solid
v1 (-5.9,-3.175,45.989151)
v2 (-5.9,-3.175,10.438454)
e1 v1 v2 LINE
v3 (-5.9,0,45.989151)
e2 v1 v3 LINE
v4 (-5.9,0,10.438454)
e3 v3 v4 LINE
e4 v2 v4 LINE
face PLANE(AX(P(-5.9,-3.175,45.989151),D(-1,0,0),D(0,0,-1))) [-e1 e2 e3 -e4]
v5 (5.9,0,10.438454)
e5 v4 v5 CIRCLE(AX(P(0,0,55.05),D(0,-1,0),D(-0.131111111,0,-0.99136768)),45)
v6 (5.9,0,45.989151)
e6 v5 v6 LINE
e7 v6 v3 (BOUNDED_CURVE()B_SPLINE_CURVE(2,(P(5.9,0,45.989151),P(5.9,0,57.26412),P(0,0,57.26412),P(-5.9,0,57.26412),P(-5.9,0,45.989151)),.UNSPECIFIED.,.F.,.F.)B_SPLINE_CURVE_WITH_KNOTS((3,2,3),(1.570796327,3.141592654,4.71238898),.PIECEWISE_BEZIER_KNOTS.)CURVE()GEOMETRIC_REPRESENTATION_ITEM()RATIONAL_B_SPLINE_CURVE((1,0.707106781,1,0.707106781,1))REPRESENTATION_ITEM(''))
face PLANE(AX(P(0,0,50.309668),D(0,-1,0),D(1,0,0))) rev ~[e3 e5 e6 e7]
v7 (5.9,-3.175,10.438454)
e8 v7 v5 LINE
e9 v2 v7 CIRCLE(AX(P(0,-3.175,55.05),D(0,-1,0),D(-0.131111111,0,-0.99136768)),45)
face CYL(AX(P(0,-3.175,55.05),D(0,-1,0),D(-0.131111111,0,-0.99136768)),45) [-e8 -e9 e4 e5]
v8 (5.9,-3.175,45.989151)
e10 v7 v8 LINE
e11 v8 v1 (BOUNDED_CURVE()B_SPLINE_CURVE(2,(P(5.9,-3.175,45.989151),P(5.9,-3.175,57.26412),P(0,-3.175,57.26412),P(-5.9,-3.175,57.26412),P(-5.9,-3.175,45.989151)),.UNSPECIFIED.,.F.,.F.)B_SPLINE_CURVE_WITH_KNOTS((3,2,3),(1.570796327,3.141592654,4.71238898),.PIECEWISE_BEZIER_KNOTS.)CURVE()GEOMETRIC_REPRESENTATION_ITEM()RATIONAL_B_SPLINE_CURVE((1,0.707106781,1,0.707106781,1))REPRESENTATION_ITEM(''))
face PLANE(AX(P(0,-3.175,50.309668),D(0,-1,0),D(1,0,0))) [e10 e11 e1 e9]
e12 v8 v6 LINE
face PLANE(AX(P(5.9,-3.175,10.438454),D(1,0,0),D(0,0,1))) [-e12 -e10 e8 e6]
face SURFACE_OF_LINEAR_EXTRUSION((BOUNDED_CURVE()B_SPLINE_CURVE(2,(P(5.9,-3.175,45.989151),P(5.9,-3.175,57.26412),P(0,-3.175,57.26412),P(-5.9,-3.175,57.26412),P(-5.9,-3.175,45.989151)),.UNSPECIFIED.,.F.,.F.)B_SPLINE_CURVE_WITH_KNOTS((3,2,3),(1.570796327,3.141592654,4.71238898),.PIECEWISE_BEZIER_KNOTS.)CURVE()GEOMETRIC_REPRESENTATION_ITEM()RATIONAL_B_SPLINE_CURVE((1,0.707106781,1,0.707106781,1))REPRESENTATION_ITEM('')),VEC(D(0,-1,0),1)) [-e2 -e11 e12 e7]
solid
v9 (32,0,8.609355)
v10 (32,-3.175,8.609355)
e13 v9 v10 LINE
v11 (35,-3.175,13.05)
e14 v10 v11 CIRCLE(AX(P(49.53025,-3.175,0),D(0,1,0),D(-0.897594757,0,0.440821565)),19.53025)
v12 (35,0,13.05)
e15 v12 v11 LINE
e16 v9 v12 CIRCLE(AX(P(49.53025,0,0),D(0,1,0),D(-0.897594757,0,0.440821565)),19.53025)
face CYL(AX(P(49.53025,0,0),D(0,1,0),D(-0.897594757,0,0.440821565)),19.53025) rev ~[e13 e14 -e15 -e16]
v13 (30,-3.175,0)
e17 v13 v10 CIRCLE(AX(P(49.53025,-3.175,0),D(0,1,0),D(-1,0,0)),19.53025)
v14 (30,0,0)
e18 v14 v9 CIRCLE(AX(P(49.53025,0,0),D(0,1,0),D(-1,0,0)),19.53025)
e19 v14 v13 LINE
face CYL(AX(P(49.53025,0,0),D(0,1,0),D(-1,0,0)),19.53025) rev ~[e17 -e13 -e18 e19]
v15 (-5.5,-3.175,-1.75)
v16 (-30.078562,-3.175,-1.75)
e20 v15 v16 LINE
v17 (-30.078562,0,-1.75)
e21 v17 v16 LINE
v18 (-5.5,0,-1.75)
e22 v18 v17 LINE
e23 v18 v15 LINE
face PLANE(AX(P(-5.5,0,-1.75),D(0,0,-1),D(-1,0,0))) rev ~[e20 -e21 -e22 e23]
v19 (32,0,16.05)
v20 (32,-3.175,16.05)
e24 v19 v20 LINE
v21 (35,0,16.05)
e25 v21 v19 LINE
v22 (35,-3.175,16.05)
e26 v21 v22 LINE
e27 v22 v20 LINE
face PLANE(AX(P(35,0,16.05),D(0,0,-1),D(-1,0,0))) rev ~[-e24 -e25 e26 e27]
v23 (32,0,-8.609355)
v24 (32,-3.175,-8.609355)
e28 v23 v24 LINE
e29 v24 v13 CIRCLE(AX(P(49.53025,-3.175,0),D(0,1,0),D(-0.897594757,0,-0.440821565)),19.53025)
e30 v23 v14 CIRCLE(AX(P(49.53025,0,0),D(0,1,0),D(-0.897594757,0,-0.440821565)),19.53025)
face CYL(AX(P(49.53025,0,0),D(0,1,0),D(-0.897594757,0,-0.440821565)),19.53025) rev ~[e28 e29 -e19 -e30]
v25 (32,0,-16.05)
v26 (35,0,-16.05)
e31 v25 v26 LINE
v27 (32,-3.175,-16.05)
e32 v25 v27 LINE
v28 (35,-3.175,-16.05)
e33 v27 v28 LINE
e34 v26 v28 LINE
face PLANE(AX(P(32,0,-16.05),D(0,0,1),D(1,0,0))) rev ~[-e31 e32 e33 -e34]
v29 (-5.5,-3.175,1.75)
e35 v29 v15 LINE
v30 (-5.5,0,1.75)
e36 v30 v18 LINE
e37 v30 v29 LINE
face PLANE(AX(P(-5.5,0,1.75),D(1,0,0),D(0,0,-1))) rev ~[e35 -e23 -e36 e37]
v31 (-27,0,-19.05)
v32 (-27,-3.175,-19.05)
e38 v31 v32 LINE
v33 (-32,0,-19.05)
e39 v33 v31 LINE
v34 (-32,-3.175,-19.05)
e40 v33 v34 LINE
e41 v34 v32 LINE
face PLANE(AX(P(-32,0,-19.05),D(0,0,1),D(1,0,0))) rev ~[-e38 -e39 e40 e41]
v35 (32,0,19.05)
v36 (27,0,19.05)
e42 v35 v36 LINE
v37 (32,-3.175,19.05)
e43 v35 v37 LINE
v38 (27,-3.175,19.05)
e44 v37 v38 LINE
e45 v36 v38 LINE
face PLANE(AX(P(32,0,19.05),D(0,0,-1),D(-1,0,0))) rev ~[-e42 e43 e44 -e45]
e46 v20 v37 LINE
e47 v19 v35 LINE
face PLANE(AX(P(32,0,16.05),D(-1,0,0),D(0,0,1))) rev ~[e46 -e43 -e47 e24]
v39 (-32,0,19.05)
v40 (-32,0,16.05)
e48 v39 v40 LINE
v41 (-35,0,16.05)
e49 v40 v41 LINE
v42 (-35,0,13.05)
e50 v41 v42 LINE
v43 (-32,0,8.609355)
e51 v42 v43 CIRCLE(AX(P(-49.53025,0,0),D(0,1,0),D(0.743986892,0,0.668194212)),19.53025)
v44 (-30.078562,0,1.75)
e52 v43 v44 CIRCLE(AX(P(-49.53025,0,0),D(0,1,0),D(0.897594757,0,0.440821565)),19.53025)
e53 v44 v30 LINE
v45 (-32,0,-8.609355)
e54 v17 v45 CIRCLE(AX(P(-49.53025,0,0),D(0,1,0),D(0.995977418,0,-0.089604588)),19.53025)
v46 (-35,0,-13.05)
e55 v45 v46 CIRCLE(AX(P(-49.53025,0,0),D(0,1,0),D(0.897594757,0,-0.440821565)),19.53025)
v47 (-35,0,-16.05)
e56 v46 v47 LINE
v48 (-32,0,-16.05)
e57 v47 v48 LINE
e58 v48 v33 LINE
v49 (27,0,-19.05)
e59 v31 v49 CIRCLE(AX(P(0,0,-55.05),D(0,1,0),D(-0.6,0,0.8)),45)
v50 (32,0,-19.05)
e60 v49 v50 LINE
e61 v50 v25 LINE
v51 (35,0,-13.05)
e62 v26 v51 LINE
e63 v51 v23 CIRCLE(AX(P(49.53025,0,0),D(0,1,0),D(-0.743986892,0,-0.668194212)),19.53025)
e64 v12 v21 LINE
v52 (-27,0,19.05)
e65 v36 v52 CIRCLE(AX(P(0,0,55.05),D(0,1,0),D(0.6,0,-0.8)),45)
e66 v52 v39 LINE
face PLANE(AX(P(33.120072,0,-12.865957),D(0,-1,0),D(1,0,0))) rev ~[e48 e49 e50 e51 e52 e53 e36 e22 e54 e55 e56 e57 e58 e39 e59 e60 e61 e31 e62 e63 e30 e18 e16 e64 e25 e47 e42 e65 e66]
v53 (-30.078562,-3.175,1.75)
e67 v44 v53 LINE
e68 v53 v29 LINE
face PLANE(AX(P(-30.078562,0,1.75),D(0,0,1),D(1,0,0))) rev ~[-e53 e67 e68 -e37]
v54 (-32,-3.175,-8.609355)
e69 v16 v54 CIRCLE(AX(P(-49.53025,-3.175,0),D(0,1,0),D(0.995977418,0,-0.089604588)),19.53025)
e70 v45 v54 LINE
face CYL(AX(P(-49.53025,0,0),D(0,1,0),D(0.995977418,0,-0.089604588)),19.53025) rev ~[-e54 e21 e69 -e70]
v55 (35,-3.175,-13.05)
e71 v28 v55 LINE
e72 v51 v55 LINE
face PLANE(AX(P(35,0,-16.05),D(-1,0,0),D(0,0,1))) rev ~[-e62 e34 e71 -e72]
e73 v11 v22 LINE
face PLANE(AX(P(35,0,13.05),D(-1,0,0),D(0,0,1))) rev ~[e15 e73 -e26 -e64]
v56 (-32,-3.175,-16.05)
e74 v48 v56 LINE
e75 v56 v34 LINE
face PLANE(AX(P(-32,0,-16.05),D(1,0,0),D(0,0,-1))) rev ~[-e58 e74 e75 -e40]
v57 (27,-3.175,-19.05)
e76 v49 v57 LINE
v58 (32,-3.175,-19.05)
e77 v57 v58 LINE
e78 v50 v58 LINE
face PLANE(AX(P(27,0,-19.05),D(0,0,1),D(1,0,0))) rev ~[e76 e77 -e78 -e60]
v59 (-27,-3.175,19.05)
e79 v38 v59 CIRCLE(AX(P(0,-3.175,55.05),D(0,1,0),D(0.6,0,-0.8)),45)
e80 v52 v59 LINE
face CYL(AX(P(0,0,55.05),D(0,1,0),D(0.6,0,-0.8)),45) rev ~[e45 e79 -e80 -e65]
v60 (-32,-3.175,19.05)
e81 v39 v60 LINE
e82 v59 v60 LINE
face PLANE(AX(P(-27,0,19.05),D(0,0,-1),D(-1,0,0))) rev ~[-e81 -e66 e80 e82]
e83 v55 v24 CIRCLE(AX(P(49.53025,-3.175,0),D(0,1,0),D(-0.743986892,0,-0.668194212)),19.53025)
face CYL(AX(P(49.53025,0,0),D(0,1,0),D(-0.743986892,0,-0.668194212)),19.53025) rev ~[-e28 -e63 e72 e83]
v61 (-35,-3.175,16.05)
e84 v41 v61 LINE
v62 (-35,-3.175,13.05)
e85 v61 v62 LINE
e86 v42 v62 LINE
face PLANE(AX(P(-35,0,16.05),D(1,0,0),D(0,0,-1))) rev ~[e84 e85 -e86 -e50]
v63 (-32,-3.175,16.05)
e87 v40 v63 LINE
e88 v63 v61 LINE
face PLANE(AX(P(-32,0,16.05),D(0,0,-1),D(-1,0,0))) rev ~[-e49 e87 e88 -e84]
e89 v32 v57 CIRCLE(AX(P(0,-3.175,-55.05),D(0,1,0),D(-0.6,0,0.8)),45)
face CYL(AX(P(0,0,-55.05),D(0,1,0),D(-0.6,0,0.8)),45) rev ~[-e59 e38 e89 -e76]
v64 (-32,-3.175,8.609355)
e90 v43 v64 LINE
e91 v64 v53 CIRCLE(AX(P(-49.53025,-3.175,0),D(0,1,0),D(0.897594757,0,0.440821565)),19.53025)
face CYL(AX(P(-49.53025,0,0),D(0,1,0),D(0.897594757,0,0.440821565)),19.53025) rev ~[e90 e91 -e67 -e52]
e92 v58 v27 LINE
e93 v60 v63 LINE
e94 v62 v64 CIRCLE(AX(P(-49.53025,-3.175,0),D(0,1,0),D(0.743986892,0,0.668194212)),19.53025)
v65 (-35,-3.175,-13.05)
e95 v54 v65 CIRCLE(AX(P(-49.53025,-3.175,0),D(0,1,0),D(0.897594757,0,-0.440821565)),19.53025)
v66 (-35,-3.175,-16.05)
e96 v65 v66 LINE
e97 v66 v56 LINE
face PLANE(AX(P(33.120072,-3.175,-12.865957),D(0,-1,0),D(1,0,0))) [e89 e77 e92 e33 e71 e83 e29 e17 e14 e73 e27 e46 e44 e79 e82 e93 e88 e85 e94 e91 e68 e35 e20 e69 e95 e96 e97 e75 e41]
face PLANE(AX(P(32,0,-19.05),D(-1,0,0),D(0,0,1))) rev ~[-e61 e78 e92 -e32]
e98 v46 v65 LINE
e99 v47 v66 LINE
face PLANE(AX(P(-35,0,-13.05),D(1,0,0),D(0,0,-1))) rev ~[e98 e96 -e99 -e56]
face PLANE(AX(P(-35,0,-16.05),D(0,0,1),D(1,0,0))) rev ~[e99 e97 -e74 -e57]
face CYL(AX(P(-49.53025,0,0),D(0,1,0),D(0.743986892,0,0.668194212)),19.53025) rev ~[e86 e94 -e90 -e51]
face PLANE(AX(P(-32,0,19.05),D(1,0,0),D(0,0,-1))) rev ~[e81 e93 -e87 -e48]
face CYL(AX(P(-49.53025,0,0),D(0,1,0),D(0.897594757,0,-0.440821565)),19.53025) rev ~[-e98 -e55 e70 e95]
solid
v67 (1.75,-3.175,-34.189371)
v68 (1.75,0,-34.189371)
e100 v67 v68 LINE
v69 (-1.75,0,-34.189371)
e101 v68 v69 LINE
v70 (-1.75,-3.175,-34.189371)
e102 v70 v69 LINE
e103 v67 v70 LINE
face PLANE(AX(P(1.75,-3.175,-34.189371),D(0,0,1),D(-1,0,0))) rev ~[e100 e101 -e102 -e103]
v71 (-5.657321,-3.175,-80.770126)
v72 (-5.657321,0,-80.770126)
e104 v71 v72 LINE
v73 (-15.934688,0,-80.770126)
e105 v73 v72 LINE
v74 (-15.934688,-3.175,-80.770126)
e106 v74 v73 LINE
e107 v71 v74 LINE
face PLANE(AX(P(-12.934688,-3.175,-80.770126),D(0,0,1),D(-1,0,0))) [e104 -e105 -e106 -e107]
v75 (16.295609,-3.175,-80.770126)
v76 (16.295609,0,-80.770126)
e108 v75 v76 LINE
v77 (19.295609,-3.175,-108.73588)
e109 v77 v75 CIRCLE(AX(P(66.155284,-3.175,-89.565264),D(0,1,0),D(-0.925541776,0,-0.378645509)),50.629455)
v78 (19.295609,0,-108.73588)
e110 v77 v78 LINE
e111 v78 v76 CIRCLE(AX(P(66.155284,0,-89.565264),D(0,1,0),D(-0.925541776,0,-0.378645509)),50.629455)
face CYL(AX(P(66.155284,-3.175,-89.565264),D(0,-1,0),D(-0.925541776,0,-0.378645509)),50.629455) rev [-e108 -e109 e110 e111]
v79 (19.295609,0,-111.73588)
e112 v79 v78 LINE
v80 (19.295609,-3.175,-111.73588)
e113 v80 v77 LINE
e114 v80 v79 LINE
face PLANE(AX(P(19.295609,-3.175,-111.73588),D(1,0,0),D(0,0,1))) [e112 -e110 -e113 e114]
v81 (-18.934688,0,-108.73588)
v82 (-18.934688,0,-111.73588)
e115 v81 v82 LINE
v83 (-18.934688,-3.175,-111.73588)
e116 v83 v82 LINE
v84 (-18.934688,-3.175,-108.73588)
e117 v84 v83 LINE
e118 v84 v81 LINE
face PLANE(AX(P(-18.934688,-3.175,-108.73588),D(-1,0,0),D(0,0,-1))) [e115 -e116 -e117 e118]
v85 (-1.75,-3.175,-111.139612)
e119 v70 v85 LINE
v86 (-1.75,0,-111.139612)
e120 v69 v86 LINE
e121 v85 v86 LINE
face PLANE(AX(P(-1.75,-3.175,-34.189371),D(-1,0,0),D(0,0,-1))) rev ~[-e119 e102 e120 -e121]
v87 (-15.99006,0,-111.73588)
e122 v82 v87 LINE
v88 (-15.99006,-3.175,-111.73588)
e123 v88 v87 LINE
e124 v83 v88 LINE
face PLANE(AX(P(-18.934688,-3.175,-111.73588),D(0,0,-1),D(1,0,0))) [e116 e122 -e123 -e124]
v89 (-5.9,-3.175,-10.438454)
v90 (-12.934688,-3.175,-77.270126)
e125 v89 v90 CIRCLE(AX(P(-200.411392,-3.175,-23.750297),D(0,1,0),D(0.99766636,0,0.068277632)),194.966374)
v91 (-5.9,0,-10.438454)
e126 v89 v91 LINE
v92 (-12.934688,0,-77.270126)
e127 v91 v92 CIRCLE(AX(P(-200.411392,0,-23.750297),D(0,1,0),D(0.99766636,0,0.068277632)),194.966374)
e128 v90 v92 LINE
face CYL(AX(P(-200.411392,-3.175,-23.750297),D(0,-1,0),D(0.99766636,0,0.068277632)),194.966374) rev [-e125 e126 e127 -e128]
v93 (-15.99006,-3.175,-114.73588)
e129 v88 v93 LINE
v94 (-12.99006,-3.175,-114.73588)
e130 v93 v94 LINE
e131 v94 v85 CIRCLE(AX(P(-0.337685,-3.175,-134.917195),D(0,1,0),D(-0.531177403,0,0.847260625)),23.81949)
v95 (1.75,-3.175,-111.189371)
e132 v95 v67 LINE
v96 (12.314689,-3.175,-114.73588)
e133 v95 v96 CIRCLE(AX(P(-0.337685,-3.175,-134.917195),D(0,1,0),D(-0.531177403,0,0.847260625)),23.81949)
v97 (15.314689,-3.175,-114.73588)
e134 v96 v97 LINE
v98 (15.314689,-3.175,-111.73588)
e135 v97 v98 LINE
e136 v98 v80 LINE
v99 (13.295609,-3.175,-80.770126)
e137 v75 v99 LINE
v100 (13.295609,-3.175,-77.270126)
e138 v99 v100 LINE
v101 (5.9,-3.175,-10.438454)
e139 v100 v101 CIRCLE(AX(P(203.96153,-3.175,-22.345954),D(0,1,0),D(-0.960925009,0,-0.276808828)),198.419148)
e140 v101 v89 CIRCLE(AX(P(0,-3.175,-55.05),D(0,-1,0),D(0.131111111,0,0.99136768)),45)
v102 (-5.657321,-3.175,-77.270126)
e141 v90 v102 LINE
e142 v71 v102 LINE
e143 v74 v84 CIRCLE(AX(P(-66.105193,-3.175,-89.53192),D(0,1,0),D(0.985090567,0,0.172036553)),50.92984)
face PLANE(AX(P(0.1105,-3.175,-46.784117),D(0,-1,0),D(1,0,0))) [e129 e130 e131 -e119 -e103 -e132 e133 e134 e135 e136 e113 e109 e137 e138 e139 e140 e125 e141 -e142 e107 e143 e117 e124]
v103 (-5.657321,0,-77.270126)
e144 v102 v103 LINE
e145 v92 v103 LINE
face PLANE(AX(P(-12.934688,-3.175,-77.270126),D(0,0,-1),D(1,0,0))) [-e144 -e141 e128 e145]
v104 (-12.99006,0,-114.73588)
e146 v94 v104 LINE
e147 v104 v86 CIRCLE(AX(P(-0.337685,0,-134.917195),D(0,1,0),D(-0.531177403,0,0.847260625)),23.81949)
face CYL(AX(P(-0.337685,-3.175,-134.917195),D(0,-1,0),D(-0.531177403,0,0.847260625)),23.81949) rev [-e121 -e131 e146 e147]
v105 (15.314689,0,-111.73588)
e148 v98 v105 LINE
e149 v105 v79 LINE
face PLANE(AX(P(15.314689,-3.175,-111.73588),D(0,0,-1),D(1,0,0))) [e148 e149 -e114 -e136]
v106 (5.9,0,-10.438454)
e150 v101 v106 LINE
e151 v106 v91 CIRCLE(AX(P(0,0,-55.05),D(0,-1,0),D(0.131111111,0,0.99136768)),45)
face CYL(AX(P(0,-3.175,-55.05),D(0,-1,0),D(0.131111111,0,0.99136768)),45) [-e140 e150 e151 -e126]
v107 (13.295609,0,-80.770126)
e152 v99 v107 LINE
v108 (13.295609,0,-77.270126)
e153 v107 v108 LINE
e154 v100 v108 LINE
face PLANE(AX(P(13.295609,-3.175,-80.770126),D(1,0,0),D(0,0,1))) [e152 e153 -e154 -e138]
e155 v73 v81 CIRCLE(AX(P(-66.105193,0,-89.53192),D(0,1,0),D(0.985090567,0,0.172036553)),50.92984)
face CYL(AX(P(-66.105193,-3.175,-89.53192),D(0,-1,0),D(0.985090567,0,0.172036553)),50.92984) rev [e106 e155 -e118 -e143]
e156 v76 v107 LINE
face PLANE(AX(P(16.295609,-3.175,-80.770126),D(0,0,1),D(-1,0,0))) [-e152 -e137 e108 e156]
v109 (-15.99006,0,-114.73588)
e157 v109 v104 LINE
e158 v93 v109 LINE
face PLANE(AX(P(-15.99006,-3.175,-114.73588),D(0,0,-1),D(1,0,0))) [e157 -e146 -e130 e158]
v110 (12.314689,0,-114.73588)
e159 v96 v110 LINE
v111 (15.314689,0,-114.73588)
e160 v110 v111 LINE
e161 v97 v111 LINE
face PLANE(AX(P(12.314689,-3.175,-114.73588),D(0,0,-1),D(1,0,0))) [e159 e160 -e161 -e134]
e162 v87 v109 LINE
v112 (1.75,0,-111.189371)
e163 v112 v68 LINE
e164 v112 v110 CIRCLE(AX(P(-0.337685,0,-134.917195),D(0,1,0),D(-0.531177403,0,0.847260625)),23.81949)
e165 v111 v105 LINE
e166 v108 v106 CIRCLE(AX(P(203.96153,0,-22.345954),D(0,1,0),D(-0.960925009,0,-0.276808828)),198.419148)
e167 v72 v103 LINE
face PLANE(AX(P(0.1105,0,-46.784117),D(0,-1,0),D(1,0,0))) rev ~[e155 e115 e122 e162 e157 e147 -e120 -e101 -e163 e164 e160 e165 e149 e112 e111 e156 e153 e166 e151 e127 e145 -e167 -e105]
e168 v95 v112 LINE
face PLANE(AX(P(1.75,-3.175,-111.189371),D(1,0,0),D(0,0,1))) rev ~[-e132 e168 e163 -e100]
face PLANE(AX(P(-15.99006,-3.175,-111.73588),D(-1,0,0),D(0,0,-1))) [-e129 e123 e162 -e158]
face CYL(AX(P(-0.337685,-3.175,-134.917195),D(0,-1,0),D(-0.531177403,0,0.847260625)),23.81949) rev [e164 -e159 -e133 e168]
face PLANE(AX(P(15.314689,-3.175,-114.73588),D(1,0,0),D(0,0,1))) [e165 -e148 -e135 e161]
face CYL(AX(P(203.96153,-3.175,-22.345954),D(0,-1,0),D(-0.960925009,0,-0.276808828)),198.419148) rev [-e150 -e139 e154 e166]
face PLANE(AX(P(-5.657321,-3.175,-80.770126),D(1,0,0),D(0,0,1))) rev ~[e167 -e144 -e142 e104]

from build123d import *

# Parameters (mm, degrees)
F1_DEPTH = 3.175
F3_DEPTH = 3.175
F4_W     = 7.2773662827
F4_H     = 3.5
F5_DEPTH = 3.1760001


# Not quite as in the source:
# - a length typed as a fraction of an inch, garbled in the dataset ("3 / 203.2 mm" for 3/8 in), is restored


with BuildPart() as f1:
    # F0 (on Front) → F1 (new body)
    with BuildSketch(Plane.XZ):
        with BuildLine():
            Line((32, -16.05), (35, -16.05))
            Line((35, -16.05), (35, -13.05))
            ThreePointArc((35, -13.05), (33.3469639854, -10.9330653905), (32, -8.6093553766))
            Line((32, -8.6093553766), (32, -16.05))
        make_face()
        with BuildLine():
            ThreePointArc((32, 8.6093553766), (33.3469639854, 10.9330653905), (35, 13.05))
            Line((35, 13.05), (35, 16.05))
            Line((35, 16.05), (32, 16.05))
            Line((32, 16.05), (32, 8.6093553766))
        make_face()
        with BuildLine():
            Line((-35, -16.05), (-32, -16.05))
            Line((-32, -16.05), (-32, -8.6093553766))
            ThreePointArc((-32, -8.6093553766), (-33.3469639854, -10.9330653905), (-35, -13.05))
            Line((-35, -13.05), (-35, -16.05))
        make_face()
        with BuildLine():
            ThreePointArc((-35, 13.05), (-33.3469639854, 10.9330653905), (-32, 8.6093553766))
            Line((-32, 8.6093553766), (-32, 16.05))
            Line((-32, 16.05), (-35, 16.05))
            Line((-35, 16.05), (-35, 13.05))
        make_face()
        with BuildLine():
            Line((27, -19.05), (32, -19.05))
            Line((32, -19.05), (32, -16.05))
            Line((32, -16.05), (32, -8.6093553766))
            ThreePointArc((32, -8.6093553766), (30.5065696236, -4.4193042439), (30, 0))
            Line((30, 0), (-5.5, 0))
            Line((-5.5, 0), (-5.5, -1.75))
            Line((-5.5, -1.75), (-30.0785620254, -1.75))
            ThreePointArc((-30.0785620254, -1.75), (-30.7239047108, -5.268020684), (-32, -8.6093553766))
            Line((-32, -8.6093553766), (-32, -16.05))
            Line((-32, -16.05), (-32, -19.05))
            Line((-32, -19.05), (-27, -19.05))
            ThreePointArc((-27, -19.05), (0, -10.05), (27, -19.05))
        make_face()
        with BuildLine():
            ThreePointArc((30, 0), (30.5065696236, 4.4193042439), (32, 8.6093553766))
            Line((32, 8.6093553766), (32, 16.05))
            Line((32, 16.05), (32, 19.05))
            Line((32, 19.05), (27, 19.05))
            ThreePointArc((27, 19.05), (0, 10.05), (-27, 19.05))
            Line((-27, 19.05), (-32, 19.05))
            Line((-32, 19.05), (-32, 16.05))
            Line((-32, 16.05), (-32, 8.6093553766))
            ThreePointArc((-32, 8.6093553766), (-30.7239047108, 5.268020684), (-30.0785620254, 1.75))
            Line((-30.0785620254, 1.75), (-5.5, 1.75))
            Line((-5.5, 1.75), (-5.5, 0))
            Line((-5.5, 0), (30, 0))
        make_face()
    extrude(amount=F1_DEPTH)


with BuildPart() as f3:
    # F2 (on face) → F3 (new body)
    with BuildSketch(Plane.XZ.offset(3.175)):
        with BuildLine():
            add(Edge.make_bspline(
                [(5.9, 45.9891505916), (5.9, 57.2641204958), (0, 57.2641204958), (-5.9, 57.2641204958), (-5.9, 45.9891505916)],
                knots=[1.5707963268, 1.5707963268, 1.5707963268, 3.1415926536, 3.1415926536, 4.7123889804, 4.7123889804, 4.7123889804], degree=2, weights=[1, 0.7071067812, 1, 0.7071067812, 1]))
            Line((-5.9, 45.9891505916), (5.9, 45.9891505916))
        make_face()
        with BuildLine():
            Line((-5.9, 45.9891505916), (-5.9, 10.4384544092))
            Line((-5.9, 10.4384544092), (5.9, 10.4384544092))
            Line((5.9, 10.4384544092), (5.9, 45.9891505916))
            add(Edge.make_bspline(
                [(0, 34.7141806875), (5.9, 34.7141806875), (5.9, 45.9891505916)],
                knots=[0, 0, 0, 1.5707963268, 1.5707963268, 1.5707963268], degree=2, weights=[1, 0.7071067812, 1]))
            add(Edge.make_bspline(
                [(-5.9, 45.9891505916), (-5.9, 34.7141806875), (0, 34.7141806875)],
                knots=[4.7123889804, 4.7123889804, 4.7123889804, 6.2831853072, 6.2831853072, 6.2831853072], degree=2, weights=[1, 0.7071067812, 1]))
        make_face()
        with BuildLine():
            Line((5.9, 45.9891505916), (-5.9, 45.9891505916))
            add(Edge.make_bspline(
                [(-5.9, 45.9891505916), (-5.9, 34.7141806875), (0, 34.7141806875)],
                knots=[4.7123889804, 4.7123889804, 4.7123889804, 6.2831853072, 6.2831853072, 6.2831853072], degree=2, weights=[1, 0.7071067812, 1]))
            add(Edge.make_bspline(
                [(0, 34.7141806875), (5.9, 34.7141806875), (5.9, 45.9891505916)],
                knots=[0, 0, 0, 1.5707963268, 1.5707963268, 1.5707963268], degree=2, weights=[1, 0.7071067812, 1]))
        make_face()
        with BuildLine():
            ThreePointArc((13.2956086248, -77.2701255913), (6.7462265041, -44.1698462786), (5.9, -10.4384544092))
            Line((5.9, -10.4384544092), (-5.9, -10.4384544092))
            ThreePointArc((-5.9, -10.4384544092), (-6.5162024945, -44.1596635216), (-12.9346875995, -77.2701255913))
            Line((-12.9346875995, -77.2701255913), (13.2956086248, -77.2701255913))
        make_face()
        with BuildLine():
            Line((13.2956086248, -80.7701255913), (13.2956086248, -77.2701255913))
            Line((13.2956086248, -77.2701255913), (-12.9346875995, -77.2701255913))
            Line((-12.9346875995, -77.2701255913), (-12.9346875995, -80.7701255913))
            Line((-12.9346875995, -80.7701255913), (-15.9346875995, -80.7701255913))
            ThreePointArc((-15.9346875995, -80.7701255913), (-15.4658906298, -94.9642033946), (-18.9346875995, -108.7358795042))
            Line((-18.9346875995, -108.7358795042), (-18.9346875995, -111.7358795042))
            Line((-18.9346875995, -111.7358795042), (-15.9900602624, -111.7358795042))
            Line((-15.9900602624, -111.7358795042), (-15.9900602624, -114.7358795042))
            Line((-15.9900602624, -114.7358795042), (-12.9900602624, -114.7358795042))
            ThreePointArc((-12.9900602624, -114.7358795042), (-0.3376854584, -111.0977054943), (12.3146893457, -114.7358795042))
            Line((12.3146893457, -114.7358795042), (15.3146893457, -114.7358795042))
            Line((15.3146893457, -114.7358795042), (15.3146893457, -111.7358795042))
            Line((15.3146893457, -111.7358795042), (19.2956086248, -111.7358795042))
            Line((19.2956086248, -111.7358795042), (19.2956086248, -108.7358795042))
            ThreePointArc((19.2956086248, -108.7358795042), (15.814653799, -94.9655076172), (16.2956086248, -80.7701255913))
            Line((16.2956086248, -80.7701255913), (13.2956086248, -80.7701255913))
        make_face()
        with BuildLine():
            Line((5.9, 10.4384544092), (-5.9, 10.4384544092))
            ThreePointArc((-5.9, 10.4384544092), (0, 10.05), (5.9, 10.4384544092))
        make_face()
        with BuildLine():
            Line((-5.9, -10.4384544092), (5.9, -10.4384544092))
            ThreePointArc((5.9, -10.4384544092), (0, -10.05), (-5.9, -10.4384544092))
        make_face()
    extrude(amount=-F3_DEPTH)

    # F4 (on face) → F5 (cut, through all)
    with BuildSketch(Plane.XZ.offset(3.175)):
        with BuildLine():
            Line((-1.75, -34.1893706199), (-1.75, -111.1396121123))
            ThreePointArc((-1.75, -111.1396121123), (0.0009152594, -111.1001122679), (1.75, -111.1893706199))
            Line((1.75, -111.1893706199), (1.75, -34.1893706199))
            Line((1.75, -34.1893706199), (-1.75, -34.1893706199))
        make_face()
        with Locations((-9.2960044582, -79.0201255913)):
            Rectangle(F4_W, F4_H)
    extrude(amount=-F5_DEPTH, mode=Mode.SUBTRACT)


solid = Compound([f1.part, f3.part])
